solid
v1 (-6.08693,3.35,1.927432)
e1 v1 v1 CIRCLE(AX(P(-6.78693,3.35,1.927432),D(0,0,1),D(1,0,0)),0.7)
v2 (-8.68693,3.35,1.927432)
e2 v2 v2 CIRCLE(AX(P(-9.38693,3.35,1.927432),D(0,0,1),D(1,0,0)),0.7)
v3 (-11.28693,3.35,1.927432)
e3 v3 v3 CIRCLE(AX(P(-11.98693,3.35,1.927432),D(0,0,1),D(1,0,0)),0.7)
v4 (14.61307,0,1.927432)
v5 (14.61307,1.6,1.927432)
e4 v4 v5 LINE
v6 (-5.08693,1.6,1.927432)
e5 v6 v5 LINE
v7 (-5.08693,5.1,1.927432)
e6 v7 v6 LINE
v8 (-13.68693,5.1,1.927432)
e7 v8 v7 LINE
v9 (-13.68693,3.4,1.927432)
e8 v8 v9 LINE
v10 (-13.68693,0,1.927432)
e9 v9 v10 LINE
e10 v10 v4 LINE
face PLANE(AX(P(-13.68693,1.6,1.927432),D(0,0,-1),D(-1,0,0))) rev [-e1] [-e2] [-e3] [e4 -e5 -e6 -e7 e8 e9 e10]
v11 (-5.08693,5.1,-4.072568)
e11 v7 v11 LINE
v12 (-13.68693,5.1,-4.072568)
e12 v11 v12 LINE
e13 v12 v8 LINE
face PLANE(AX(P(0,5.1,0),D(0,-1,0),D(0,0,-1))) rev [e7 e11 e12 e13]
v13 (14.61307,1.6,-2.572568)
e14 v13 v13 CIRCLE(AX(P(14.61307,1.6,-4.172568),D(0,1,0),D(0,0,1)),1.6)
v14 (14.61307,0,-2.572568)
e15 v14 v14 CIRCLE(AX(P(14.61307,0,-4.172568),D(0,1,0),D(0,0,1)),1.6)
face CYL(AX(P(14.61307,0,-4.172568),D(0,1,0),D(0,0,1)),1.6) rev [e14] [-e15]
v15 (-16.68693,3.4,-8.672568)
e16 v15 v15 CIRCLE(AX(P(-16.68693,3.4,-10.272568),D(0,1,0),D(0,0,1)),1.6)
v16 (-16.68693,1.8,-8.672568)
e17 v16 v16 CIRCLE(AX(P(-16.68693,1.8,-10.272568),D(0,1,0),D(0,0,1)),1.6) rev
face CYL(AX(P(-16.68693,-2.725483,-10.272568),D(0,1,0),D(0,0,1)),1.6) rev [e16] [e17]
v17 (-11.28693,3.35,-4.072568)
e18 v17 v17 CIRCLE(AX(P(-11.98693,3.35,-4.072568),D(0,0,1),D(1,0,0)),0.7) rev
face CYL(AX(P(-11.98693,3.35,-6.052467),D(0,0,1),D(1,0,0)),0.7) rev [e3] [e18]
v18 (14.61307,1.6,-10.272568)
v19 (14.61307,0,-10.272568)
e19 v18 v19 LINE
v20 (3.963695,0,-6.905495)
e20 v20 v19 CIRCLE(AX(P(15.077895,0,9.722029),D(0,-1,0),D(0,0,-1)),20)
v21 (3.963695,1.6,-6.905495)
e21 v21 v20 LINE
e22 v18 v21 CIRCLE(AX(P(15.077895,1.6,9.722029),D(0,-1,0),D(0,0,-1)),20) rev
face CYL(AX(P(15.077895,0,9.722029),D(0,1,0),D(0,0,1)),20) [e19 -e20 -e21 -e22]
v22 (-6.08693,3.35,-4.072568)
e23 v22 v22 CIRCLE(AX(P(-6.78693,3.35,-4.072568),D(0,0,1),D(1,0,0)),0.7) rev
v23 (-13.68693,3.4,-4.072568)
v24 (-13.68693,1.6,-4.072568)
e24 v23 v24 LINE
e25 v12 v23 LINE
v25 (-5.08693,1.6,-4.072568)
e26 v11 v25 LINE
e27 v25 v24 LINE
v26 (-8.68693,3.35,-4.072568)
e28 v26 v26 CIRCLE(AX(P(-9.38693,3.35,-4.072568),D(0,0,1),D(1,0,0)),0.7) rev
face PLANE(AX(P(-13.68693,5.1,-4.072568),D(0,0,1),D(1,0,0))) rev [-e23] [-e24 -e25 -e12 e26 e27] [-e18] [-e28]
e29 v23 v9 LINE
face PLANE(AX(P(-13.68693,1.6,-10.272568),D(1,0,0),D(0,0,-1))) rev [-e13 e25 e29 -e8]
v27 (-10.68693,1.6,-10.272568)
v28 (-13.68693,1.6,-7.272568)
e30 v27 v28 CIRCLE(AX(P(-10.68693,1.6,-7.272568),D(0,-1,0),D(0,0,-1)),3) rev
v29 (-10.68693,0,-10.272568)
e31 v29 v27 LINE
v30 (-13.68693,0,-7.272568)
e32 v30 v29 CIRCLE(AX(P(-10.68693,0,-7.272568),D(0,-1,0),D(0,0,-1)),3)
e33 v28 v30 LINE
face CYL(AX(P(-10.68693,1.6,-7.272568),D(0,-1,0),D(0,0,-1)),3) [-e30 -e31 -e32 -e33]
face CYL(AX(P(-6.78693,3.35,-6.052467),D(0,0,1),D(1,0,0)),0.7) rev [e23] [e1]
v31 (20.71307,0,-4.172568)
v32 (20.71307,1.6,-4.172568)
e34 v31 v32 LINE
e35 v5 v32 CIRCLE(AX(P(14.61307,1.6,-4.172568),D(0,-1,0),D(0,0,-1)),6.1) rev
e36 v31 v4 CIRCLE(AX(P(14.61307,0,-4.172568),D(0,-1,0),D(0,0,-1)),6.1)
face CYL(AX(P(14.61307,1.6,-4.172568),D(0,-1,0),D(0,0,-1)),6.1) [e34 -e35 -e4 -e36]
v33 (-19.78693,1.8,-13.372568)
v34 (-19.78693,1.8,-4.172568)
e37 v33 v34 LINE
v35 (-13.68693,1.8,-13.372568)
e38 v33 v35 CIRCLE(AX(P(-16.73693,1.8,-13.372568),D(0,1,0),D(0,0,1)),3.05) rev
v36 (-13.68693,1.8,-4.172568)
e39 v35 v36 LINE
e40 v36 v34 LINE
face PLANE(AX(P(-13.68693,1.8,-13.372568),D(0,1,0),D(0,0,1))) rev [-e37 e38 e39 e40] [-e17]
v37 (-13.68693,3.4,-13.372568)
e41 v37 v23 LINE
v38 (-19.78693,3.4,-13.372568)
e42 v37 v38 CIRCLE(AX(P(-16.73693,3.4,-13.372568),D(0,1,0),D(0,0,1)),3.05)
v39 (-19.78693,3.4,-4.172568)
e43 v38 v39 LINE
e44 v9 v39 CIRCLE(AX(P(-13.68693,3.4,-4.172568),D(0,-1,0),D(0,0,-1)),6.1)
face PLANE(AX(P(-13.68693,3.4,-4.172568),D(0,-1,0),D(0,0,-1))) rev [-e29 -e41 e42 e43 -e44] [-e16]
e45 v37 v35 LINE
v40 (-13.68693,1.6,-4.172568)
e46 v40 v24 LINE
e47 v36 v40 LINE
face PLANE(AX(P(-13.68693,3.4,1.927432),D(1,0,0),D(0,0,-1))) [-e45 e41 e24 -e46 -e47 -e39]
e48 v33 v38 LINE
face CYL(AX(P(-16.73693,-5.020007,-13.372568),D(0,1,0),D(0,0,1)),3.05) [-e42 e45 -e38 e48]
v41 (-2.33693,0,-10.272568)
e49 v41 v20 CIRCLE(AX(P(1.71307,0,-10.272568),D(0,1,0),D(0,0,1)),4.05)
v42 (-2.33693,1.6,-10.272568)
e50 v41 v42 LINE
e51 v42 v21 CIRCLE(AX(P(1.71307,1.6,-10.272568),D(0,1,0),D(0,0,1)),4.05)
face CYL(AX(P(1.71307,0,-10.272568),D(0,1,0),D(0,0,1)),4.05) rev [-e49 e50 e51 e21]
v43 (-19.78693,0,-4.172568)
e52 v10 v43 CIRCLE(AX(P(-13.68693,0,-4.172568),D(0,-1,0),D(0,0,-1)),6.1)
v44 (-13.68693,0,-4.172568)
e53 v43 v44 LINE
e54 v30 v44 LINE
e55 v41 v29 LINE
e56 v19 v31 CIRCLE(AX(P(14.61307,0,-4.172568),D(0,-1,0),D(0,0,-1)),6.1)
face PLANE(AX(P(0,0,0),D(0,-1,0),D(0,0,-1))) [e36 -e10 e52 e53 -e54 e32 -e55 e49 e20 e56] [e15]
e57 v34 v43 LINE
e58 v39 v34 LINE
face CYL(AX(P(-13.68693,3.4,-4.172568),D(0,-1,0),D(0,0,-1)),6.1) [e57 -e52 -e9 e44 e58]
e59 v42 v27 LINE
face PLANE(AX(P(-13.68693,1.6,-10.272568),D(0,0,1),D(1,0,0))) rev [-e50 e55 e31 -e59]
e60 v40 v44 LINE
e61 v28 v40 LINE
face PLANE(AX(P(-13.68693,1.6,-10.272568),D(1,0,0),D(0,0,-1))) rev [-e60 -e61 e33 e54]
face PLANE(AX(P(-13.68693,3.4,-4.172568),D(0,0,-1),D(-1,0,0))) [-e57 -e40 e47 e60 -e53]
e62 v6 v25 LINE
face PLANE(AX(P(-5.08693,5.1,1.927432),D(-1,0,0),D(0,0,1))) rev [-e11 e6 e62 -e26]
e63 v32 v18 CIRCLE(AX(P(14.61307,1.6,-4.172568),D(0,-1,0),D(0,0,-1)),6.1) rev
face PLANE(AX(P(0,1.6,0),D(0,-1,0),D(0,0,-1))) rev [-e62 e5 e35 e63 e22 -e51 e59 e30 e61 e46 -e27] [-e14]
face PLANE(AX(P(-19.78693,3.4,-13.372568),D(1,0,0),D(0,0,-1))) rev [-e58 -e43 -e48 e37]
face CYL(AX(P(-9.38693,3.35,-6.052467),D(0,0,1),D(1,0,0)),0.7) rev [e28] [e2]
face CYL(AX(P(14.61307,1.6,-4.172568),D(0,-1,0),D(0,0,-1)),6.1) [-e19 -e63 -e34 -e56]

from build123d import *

# Parameters (mm, degrees)
SKETCH1_W           = 34.4
SKETCH1_H           = 12.2
BOSS_EXTRUDE1_DEPTH = 1.6
SKETCH8_R           = 1.6
CUT_EXTRUDE3_DEPTH  = 24.175783188
FILLET2_R           = 3
FILLET3_R           = 6.1
SKETCH2_W           = 8.6
SKETCH2_H           = 6
BOSS_EXTRUDE2_DEPTH = 3.5
SKETCH3_R           = 0.7
CUT_EXTRUDE1_DEPTH  = 6
BOSS_EXTRUDE3_DEPTH = 3.4
SKETCH5_W           = 6.1
SKETCH5_H           = 1.6
BOSS_EXTRUDE4_DEPTH = 9.2
BOSS_EXTRUDE5_DEPTH = 1.6
SKETCH7_R           = 1.6
CUT_EXTRUDE2_DEPTH  = 1.6
FILLET1_R           = 20


# Some blends are built 0.0001 mm under size
with BuildPart() as part:
    # Sketch1 → Boss-Extrude1 (new body)
    with BuildSketch(Plane(origin=(0, 0, 0), x_dir=(1, 0, 0), z_dir=(0, 1, 0))):
        with Locations((3.513069909, 4.172568389)):
            Rectangle(SKETCH1_W, SKETCH1_H)
    extrude(amount=BOSS_EXTRUDE1_DEPTH)

    # Sketch8 → Cut-Extrude3 (cut, through all)
    with BuildSketch(Plane(origin=(0, 1.6, 0), x_dir=(1, 0, 0), z_dir=(0, 1, 0))):
        with Locations(Location((14.613069909, 4.172568389, 0), (0, 0, 270))):
            Circle(SKETCH8_R)
        with BuildLine():
            Line((5.763069909, 10.272568389), (-2.336930091, 10.272568389))
            ThreePointArc((-2.336930091, 10.272568389), (1.713069909, 6.222568389), (5.763069909, 10.272568389))
        make_face()
    extrude(amount=-CUT_EXTRUDE3_DEPTH, mode=Mode.SUBTRACT)

    # Fillet2
    fillet2_edges = [part.edges().sort_by_distance(p)[0] for p in [
        (-13.686930091, 0.8, -10.272568389),
    ]]
    fillet(fillet2_edges, radius=FILLET2_R)

    # Fillet3
    fillet3_edges = [part.edges().sort_by_distance(p)[0] for p in [
        (20.713069909, 0.8, 1.927431611),
        (20.713069909, 0.8, -10.272568389),
    ]]
    fillet(fillet3_edges, radius=FILLET3_R - 0.0001)  # a hair under: the kernel refuses the full size

    # Sketch2 → Boss-Extrude2 (add)
    with BuildSketch(Plane(origin=(0, 1.6, 0), x_dir=(1, 0, 0), z_dir=(0, 1, 0))):
        with Locations((-9.386930091, 1.072568389)):
            Rectangle(SKETCH2_W, SKETCH2_H)
    extrude(amount=BOSS_EXTRUDE2_DEPTH)

    # Sketch3 → Cut-Extrude1 (cut)
    with BuildSketch(Plane.XY.offset(1.927431611)):
        with Locations((-11.986930091, 3.35)):
            Circle(SKETCH3_R)
        with Locations((-6.786930091, 3.35)):
            Circle(SKETCH3_R)
        with Locations((-9.386930091, 3.35)):
            Circle(SKETCH3_R)
    extrude(amount=-CUT_EXTRUDE1_DEPTH, mode=Mode.SUBTRACT)



with BuildPart() as body_2:
    # Sketch4 → Boss-Extrude3 (new body)
    with BuildSketch(Plane.XZ):
        with BuildLine():
            Line((-13.686930091, 1.927431611), (-13.686930091, -4.172568389))
            Line((-13.686930091, -4.172568389), (-19.786930091, -4.172568389))
            ThreePointArc((-19.786930091, -4.172568389), (-18.000281456, 0.140782976), (-13.686930091, 1.927431611))
        make_face()
    extrude(amount=-BOSS_EXTRUDE3_DEPTH)


with BuildPart() as part_1:
    add(part.part)

    add(body_2.part)  # Boss-Extrude4 merges body 2
    # Sketch5 → Boss-Extrude4 (add)
    with BuildSketch(Plane(origin=(0, 0, -4.172568389), x_dir=(-1, 0, 0), z_dir=(0, 0, -1))):
        with Locations((16.736930091, 2.6)):
            Rectangle(SKETCH5_W, SKETCH5_H)
    extrude(amount=BOSS_EXTRUDE4_DEPTH)

    # Sketch6 → Boss-Extrude5 (add)
    with BuildSketch(Plane(origin=(0, 3.4, 0), x_dir=(1, 0, 0), z_dir=(0, 1, 0))):
        with BuildLine():
            Line((-19.786930091, 13.372568389), (-13.686930091, 13.372568389))
            ThreePointArc((-13.686930091, 13.372568389), (-16.736930091, 16.422568389), (-19.786930091, 13.372568389))
        make_face()
    extrude(amount=-BOSS_EXTRUDE5_DEPTH)

    # Sketch7 → Cut-Extrude2 (cut)
    with BuildSketch(Plane(origin=(0, 3.4, 0), x_dir=(1, 0, 0), z_dir=(0, 1, 0))):
        with Locations(Location((-16.686930091, 10.272568389, 0), (0, 0, 270))):
            Circle(SKETCH7_R)
    extrude(amount=-CUT_EXTRUDE2_DEPTH, mode=Mode.SUBTRACT)

    # Fillet1
    # the kernel refuses this fillet: 20 mm, written as the material it takes off along each edge
    with BuildSketch(Plane(origin=(5.763069909, 23.72525, -10.272568389), x_dir=(-0.47132268480502076, 0, 0.8819608419811998), z_dir=(0, -1, 0))) as fillet1_piece_1:
        with BuildLine():
            CenterArc((13.244167443, -17.63921684), FILLET1_R, 118.12018917, 32.428171428)
            Line((-4.171252893, -7.805441648), (-4.5195613, -7.608766144))
            ThreePointArc((-4.5195613, -7.608766144), (-2.438410783, -3.71419175), (-0.352784337, 0.188529074))
            Line((-0.352784337, 0.188529074), (0.188529074, 0.352784337))
            ThreePointArc((0.188529074, 0.352784337), (1.908856873, -0.07805859), (3.629184673, 0.352784337))
            Line((3.629184673, 0.352784337), (3.817713747, 0))
        make_face()
    extrude(amount=45.8505, mode=Mode.SUBTRACT)


solid = part_1.part
